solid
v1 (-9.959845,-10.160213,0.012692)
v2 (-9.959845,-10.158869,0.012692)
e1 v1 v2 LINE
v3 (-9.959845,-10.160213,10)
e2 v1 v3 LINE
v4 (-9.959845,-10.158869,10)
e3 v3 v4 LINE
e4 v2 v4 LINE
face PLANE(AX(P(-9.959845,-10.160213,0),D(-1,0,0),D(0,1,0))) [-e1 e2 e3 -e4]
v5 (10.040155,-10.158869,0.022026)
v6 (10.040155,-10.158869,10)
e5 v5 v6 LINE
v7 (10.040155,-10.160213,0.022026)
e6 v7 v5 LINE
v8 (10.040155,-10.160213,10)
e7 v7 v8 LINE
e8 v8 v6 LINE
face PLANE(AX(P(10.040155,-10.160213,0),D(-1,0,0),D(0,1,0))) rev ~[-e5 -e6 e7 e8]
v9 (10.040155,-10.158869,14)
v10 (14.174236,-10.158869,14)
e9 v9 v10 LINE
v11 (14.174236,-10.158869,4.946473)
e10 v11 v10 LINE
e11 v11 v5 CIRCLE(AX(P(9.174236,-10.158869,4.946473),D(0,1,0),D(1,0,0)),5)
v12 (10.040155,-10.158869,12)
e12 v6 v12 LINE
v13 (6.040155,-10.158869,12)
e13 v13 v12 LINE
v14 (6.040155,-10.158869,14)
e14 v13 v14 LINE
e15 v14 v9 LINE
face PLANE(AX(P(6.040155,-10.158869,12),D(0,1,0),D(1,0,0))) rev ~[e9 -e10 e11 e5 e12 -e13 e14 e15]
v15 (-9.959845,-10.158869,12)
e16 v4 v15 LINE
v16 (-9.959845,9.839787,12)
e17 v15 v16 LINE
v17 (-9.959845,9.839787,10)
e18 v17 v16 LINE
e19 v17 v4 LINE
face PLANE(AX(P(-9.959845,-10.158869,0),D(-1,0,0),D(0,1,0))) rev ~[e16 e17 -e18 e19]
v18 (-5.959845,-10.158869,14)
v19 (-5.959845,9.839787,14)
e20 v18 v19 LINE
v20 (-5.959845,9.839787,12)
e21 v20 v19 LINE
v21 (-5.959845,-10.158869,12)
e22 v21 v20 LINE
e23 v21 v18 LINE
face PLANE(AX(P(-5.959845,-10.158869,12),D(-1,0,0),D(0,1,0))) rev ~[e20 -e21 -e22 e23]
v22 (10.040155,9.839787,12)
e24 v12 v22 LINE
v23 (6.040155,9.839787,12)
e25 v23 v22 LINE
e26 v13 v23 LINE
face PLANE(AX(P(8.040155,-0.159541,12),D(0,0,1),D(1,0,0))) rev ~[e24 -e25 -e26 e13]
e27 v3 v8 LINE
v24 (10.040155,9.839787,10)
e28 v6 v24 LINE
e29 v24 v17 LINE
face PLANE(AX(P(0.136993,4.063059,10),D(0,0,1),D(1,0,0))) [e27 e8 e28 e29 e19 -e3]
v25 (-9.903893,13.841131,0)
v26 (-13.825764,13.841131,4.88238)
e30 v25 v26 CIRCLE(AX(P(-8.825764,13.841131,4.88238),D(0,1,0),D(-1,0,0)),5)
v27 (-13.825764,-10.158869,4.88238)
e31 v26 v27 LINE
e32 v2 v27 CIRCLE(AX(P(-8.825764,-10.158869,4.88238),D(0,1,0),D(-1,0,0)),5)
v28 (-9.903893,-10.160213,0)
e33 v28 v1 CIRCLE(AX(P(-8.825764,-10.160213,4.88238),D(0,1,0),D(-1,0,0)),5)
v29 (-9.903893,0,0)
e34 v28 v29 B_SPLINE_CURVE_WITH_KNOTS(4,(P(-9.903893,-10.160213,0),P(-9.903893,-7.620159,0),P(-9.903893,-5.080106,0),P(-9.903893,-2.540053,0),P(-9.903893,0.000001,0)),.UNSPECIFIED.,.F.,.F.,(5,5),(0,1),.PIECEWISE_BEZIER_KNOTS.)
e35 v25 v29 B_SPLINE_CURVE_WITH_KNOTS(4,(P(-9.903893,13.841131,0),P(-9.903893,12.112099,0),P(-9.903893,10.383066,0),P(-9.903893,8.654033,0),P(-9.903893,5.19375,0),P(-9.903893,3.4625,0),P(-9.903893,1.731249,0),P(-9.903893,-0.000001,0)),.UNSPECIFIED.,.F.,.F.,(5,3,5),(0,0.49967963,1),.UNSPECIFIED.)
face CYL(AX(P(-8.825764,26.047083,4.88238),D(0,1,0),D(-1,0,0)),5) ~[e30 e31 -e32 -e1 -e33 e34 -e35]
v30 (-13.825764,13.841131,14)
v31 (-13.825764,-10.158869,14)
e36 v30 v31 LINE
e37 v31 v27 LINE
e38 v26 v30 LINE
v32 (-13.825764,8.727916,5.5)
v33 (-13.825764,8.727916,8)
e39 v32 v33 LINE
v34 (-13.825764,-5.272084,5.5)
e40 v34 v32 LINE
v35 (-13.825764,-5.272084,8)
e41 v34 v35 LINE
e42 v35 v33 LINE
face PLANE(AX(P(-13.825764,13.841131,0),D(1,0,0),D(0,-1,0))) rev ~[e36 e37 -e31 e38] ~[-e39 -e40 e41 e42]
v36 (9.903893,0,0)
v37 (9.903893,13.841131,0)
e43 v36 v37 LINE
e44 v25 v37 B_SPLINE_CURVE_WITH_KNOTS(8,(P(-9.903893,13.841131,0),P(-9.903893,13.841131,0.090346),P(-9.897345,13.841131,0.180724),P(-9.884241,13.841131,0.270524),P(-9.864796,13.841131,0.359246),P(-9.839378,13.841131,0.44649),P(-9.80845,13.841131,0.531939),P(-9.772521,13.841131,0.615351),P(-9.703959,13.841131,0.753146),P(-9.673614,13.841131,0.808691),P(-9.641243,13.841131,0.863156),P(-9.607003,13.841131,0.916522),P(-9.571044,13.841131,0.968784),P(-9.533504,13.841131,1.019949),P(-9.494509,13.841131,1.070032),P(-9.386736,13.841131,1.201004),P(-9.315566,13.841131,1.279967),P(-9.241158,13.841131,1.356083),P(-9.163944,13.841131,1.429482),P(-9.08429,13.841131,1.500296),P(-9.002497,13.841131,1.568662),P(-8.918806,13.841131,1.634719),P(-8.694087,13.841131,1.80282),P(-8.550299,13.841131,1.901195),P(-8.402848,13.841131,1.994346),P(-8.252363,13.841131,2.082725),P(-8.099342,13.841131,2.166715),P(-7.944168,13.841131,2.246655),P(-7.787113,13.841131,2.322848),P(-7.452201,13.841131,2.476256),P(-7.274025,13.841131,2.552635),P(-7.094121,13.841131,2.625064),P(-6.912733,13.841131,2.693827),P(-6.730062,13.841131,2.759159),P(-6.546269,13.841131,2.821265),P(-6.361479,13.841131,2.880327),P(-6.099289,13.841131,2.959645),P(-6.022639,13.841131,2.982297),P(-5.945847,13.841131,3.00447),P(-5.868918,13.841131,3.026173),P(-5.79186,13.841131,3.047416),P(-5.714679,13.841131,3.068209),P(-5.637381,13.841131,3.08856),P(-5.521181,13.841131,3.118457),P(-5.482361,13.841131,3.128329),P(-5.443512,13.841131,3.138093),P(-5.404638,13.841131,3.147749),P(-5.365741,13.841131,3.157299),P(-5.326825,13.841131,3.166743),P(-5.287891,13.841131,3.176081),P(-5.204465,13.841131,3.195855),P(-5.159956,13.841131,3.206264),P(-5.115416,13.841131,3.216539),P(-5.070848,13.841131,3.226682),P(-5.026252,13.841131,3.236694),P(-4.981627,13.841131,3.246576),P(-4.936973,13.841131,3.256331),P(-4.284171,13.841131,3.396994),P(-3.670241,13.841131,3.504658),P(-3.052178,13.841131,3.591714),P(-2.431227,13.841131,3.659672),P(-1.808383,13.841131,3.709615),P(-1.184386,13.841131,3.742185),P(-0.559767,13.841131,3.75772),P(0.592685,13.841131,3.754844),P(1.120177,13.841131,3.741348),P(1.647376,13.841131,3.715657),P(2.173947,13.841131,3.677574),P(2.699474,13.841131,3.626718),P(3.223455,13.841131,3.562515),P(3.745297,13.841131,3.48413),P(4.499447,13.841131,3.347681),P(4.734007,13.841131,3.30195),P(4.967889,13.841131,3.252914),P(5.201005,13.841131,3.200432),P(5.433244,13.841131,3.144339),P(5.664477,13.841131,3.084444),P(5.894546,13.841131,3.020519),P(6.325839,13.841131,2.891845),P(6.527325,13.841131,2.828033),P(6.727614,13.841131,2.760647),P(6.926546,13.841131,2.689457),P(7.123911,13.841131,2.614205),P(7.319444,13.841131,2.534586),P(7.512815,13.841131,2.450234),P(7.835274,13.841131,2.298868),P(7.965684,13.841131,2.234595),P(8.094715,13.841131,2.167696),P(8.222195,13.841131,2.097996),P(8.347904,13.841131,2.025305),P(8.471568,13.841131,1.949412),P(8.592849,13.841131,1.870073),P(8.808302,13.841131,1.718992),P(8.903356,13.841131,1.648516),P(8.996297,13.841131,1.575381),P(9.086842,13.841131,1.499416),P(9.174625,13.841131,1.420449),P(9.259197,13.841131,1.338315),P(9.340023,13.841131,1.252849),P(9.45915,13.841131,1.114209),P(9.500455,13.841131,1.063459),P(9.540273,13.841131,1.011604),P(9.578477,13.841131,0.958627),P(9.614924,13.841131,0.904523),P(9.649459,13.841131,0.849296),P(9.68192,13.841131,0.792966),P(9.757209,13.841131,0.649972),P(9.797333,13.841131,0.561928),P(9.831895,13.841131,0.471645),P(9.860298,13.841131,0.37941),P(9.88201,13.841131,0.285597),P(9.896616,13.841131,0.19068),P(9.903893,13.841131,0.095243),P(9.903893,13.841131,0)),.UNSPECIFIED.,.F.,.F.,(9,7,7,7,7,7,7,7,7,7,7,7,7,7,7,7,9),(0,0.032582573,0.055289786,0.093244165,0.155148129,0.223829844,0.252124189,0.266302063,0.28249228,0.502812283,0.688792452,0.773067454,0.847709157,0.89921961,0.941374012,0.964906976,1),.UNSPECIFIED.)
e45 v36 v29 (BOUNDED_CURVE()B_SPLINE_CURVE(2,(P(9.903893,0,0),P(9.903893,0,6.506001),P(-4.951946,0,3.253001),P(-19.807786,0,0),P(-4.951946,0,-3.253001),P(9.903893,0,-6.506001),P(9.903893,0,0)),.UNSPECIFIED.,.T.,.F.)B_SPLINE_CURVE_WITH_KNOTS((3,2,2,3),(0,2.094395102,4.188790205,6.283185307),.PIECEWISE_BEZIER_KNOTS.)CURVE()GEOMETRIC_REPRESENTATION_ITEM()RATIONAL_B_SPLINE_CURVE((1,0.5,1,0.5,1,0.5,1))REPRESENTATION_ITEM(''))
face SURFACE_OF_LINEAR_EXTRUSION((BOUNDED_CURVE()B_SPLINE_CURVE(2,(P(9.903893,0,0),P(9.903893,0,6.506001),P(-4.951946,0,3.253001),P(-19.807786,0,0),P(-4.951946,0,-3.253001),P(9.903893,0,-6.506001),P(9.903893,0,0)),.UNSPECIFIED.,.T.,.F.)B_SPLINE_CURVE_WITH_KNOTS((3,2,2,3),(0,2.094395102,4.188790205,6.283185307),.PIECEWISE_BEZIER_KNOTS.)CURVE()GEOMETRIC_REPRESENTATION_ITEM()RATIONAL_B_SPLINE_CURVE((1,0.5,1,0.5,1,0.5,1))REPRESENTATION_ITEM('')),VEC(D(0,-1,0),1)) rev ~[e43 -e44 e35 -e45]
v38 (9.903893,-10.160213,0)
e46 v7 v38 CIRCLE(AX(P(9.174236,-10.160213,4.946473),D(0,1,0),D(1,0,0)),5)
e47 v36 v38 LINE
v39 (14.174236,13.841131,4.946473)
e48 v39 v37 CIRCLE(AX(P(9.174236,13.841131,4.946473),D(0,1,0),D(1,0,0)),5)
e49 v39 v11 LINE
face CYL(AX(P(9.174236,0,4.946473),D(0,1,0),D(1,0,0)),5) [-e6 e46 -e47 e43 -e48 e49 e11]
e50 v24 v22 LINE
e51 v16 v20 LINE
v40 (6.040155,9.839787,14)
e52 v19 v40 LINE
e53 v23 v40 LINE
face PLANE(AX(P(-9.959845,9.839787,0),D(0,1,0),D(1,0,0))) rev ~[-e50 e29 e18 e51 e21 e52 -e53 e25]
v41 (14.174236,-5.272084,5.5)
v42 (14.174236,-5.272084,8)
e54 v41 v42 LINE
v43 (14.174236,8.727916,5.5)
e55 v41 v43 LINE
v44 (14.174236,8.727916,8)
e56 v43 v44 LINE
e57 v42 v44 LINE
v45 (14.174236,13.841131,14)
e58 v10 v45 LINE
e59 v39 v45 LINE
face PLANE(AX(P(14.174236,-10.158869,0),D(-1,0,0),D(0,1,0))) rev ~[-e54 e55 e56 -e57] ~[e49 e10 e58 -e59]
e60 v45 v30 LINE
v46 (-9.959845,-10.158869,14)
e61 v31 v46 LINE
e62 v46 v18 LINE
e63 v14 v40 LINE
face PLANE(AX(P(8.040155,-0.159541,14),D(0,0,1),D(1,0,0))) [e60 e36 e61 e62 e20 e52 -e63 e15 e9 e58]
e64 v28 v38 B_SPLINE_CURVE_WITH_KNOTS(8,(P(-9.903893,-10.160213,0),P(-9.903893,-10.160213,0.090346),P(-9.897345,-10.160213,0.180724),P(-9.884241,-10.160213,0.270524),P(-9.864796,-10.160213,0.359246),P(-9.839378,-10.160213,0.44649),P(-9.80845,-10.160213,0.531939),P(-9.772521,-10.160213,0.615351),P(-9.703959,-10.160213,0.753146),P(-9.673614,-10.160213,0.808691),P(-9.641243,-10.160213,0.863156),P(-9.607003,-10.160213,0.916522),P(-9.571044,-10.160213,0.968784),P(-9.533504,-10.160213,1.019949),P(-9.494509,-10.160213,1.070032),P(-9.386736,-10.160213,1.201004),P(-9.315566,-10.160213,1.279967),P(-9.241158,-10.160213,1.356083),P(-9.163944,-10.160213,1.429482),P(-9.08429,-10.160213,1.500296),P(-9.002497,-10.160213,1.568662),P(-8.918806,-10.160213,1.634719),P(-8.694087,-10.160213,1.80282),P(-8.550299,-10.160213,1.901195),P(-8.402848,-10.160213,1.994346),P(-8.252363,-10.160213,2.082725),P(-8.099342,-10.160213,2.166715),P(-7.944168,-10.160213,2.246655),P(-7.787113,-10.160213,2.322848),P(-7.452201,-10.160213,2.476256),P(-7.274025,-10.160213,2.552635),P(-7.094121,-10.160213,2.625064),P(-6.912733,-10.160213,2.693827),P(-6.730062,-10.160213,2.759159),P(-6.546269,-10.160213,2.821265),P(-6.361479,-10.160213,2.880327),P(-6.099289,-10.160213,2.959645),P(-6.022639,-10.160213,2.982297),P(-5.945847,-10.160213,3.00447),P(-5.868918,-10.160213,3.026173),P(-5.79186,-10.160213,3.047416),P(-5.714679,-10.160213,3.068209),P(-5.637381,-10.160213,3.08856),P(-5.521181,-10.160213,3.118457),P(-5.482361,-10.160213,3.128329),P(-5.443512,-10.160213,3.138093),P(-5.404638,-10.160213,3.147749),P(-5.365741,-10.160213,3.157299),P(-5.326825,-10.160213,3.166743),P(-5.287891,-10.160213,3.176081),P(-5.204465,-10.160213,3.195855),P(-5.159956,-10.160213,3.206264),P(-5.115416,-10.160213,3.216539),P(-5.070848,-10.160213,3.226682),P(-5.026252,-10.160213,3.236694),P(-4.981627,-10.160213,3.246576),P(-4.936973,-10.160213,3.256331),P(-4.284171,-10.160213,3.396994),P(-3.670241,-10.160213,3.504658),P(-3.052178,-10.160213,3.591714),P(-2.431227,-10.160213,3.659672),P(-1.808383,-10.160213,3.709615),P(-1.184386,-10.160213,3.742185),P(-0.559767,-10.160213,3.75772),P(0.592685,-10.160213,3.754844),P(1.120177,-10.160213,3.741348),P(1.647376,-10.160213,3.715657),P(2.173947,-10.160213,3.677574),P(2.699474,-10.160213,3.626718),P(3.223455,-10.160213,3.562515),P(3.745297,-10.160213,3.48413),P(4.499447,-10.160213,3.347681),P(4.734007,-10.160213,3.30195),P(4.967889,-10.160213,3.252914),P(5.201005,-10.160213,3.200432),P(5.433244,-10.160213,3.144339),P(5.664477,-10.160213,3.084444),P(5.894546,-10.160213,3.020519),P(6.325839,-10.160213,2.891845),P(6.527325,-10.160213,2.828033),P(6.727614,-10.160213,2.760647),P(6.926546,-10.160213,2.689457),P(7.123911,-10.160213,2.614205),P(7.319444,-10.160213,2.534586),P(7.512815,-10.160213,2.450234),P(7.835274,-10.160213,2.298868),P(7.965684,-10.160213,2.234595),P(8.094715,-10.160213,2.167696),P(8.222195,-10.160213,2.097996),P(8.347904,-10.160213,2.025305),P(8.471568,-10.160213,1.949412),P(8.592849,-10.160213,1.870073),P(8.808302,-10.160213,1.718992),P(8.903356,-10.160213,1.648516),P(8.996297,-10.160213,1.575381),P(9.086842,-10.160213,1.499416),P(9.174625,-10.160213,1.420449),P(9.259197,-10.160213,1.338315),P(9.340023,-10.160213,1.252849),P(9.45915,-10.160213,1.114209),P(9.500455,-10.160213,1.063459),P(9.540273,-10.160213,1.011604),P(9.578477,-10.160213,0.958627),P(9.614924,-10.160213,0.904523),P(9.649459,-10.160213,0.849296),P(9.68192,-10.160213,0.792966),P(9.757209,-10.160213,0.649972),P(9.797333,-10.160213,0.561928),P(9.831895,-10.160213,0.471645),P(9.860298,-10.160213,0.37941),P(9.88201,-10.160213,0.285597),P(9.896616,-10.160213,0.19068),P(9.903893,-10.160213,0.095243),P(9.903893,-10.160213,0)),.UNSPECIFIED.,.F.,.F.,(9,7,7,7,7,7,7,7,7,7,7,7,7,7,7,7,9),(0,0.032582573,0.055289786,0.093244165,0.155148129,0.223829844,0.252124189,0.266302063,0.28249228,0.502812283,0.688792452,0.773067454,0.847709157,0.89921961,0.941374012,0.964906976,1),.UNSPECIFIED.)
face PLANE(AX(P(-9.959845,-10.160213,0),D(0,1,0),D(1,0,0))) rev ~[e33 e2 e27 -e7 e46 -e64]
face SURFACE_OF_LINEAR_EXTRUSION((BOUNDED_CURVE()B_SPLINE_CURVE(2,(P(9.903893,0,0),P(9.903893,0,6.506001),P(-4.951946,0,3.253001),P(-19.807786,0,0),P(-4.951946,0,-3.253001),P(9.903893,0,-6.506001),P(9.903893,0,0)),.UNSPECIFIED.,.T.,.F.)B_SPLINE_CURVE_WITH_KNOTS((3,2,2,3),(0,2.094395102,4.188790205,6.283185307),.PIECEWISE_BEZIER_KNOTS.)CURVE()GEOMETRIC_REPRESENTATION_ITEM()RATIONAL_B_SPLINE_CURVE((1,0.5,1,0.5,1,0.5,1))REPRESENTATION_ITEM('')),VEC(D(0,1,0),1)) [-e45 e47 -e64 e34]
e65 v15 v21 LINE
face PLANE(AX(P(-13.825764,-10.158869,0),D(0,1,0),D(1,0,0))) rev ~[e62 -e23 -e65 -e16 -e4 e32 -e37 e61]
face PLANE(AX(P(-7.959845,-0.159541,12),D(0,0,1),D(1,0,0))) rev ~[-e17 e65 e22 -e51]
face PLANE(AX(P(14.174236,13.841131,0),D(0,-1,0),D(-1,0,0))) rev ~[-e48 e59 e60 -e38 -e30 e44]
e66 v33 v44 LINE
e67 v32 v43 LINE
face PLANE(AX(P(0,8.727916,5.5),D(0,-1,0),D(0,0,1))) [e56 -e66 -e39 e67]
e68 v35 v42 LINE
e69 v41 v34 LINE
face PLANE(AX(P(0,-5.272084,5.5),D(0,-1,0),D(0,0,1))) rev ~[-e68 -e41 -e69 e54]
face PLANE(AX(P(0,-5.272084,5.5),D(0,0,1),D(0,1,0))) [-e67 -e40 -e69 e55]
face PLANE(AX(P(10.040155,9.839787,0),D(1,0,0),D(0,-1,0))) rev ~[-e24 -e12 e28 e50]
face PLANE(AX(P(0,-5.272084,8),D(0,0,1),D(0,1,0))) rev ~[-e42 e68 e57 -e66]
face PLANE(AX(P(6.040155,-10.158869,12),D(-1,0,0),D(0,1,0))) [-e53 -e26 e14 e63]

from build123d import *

# Parameters (mm, degrees)
F0_W          = 4
F0_H          = 19.9986558093
F0_W_2        = 12
F0_H_2        = 0.0013441907
F1_DEPTH      = 10
F2_DEPTH      = 14
F3_START      = 12
F3_DEPTH      = 2
F4_W          = 14
F4_H          = 2.5
F5_DEPTH      = 25
F5_DEPTH_BACK = 25
F7_DEPTH      = 25
F7_DEPTH_BACK = 25
F8_T1_DEPTH   = 22.5250523131
F8_T3_DEPTH   = 26.207315151
F8_T5_DEPTH   = 26.047082038
F8_T7_DEPTH   = 22.364820273


# Not quite as in the source:
# - a fillet or chamfer that OpenCascade refuses, or shapes differently, is made with other operations: its cross-section is extruded or revolved along the edge and cut away or added


with BuildPart() as f1:
    # F0 (on Top) → F1 (new body)
    with BuildSketch(Plane.XY):
        Polygon((-9.9598446302, -10.1588685066), (-9.9598446302, 9.8397873028), (-5.9598446302, 9.8397873028), (6.0401553698, 9.8397873028), (10.0401553698, 9.8397873028), (10.0401553698, -10.1588685066), (14.174235519, -10.1588685066), (14.174235519, 13.8411314934), (-13.825764481, 13.8411314934), (-13.825764481, -10.1588685066), align=None)
        with Locations((-7.9598446302, -0.1595406019)):
            Rectangle(F0_W, F0_H)
        with Locations((0.0401553698, -0.1595406019)):
            Rectangle(F0_W_2, F0_H)
        with Locations((-7.9598446302, -10.1595406019)):
            Rectangle(F0_W, F0_H_2)
        with Locations((8.0401553698, -0.1595406019)):
            Rectangle(F0_W, F0_H)
        with Locations((0.0401553698, -10.1595406019)):
            Rectangle(F0_W_2, F0_H_2)
        with Locations((8.0401553698, -10.1595406019)):
            Rectangle(F0_W, F0_H_2)
    extrude(amount=F1_DEPTH)

    # F0 (on Top) → F2 (join)
    with BuildSketch(Plane.XY):
        Polygon((-9.9598446302, -10.1588685066), (-9.9598446302, 9.8397873028), (-5.9598446302, 9.8397873028), (6.0401553698, 9.8397873028), (10.0401553698, 9.8397873028), (10.0401553698, -10.1588685066), (14.174235519, -10.1588685066), (14.174235519, 13.8411314934), (-13.825764481, 13.8411314934), (-13.825764481, -10.1588685066), align=None)
    extrude(amount=F2_DEPTH)

    # F0 (on Top) → F3 (join)
    with BuildSketch(Plane.XY.offset(F3_START)):
        with Locations((8.0401553698, -0.1595406019)):
            Rectangle(F0_W, F0_H)
        with Locations((-7.9598446302, -0.1595406019)):
            Rectangle(F0_W, F0_H)
    extrude(amount=F3_DEPTH)

    # F4 (on Right) → F5 (cut, two sides)
    with BuildSketch(Plane.YZ) as f5_sk:
        with Locations((1.7279156186, 6.75)):
            Rectangle(F4_W, F4_H)
    extrude(amount=-F5_DEPTH, mode=Mode.SUBTRACT)
    extrude(f5_sk.sketch, amount=F5_DEPTH_BACK, mode=Mode.SUBTRACT)

    # F6 (on Front) → F7 (cut, two sides)
    with BuildSketch(Plane.XZ) as f7_sk:
        with BuildLine():
            add(Edge.make_bspline(
                [(9.9038929624, 0), (9.9038929624, 6.5060013768), (-4.9519464812, 3.2530006884), (-19.8077859248, 0), (-4.9519464812, -3.2530006884), (9.9038929624, -6.5060013768), (9.9038929624, 0)],
                knots=[0, 0, 0, 2.0943951024, 2.0943951024, 4.1887902048, 4.1887902048, 6.2831853072, 6.2831853072, 6.2831853072], degree=2, weights=[1, 0.5, 1, 0.5, 1, 0.5, 1]))
        make_face()
    extrude(amount=-F7_DEPTH, mode=Mode.SUBTRACT)
    extrude(f7_sk.sketch, amount=F7_DEPTH_BACK, mode=Mode.SUBTRACT)

    # F8: fillet of radius 5 on 2 edges, made by hand

    # F8_s2 → F8_t1 (cut)
    with BuildSketch(Plane.XZ.offset(-7.45e-08)):
        with BuildLine():
            ThreePointArc((14.174235519, 4.9464734928), (12.9589605564, 1.6790805885), (9.9038929624, 0))
            Line((9.9038929624, 0), (14.174235519, 0))
            Line((14.174235519, 0), (14.174235519, 4.9464734928))
        make_face()
    extrude(amount=F8_T1_DEPTH, mode=Mode.SUBTRACT)

    # F8_s4 → F8_t3 (cut)
    with BuildSketch(Plane.XZ.offset(-26.2073152255)):
        with BuildLine():
            ThreePointArc((14.174235519, 4.9464734928), (12.9589605564, 1.6790805885), (9.9038929624, 0))
            Line((9.9038929624, 0), (14.174235519, 0))
            Line((14.174235519, 0), (14.174235519, 4.9464734928))
        make_face()
    extrude(amount=F8_T3_DEPTH, mode=Mode.SUBTRACT)

    # F8_s6 → F8_t5 (cut)
    with BuildSketch(Plane.XZ.offset(-26.0470826489)):
        with BuildLine():
            ThreePointArc((-13.825764481, 4.8823804622), (-12.7238821297, 1.7511380895), (-9.9038929624, 0))
            Line((-9.9038929624, 0), (-13.825764481, 0))
            Line((-13.825764481, 0), (-13.825764481, 4.8823804622))
        make_face()
    extrude(amount=F8_T5_DEPTH, mode=Mode.SUBTRACT)

    # F8_s8 → F8_t7 (cut)
    with BuildSketch(Plane.XZ.offset(-6.109e-07)):
        with BuildLine():
            ThreePointArc((-13.825764481, 4.8823804622), (-12.7238821297, 1.7511380895), (-9.9038929624, 0))
            Line((-9.9038929624, 0), (-13.825764481, 0))
            Line((-13.825764481, 0), (-13.825764481, 4.8823804622))
        make_face()
    extrude(amount=F8_T7_DEPTH, mode=Mode.SUBTRACT)


solid = f1.part
